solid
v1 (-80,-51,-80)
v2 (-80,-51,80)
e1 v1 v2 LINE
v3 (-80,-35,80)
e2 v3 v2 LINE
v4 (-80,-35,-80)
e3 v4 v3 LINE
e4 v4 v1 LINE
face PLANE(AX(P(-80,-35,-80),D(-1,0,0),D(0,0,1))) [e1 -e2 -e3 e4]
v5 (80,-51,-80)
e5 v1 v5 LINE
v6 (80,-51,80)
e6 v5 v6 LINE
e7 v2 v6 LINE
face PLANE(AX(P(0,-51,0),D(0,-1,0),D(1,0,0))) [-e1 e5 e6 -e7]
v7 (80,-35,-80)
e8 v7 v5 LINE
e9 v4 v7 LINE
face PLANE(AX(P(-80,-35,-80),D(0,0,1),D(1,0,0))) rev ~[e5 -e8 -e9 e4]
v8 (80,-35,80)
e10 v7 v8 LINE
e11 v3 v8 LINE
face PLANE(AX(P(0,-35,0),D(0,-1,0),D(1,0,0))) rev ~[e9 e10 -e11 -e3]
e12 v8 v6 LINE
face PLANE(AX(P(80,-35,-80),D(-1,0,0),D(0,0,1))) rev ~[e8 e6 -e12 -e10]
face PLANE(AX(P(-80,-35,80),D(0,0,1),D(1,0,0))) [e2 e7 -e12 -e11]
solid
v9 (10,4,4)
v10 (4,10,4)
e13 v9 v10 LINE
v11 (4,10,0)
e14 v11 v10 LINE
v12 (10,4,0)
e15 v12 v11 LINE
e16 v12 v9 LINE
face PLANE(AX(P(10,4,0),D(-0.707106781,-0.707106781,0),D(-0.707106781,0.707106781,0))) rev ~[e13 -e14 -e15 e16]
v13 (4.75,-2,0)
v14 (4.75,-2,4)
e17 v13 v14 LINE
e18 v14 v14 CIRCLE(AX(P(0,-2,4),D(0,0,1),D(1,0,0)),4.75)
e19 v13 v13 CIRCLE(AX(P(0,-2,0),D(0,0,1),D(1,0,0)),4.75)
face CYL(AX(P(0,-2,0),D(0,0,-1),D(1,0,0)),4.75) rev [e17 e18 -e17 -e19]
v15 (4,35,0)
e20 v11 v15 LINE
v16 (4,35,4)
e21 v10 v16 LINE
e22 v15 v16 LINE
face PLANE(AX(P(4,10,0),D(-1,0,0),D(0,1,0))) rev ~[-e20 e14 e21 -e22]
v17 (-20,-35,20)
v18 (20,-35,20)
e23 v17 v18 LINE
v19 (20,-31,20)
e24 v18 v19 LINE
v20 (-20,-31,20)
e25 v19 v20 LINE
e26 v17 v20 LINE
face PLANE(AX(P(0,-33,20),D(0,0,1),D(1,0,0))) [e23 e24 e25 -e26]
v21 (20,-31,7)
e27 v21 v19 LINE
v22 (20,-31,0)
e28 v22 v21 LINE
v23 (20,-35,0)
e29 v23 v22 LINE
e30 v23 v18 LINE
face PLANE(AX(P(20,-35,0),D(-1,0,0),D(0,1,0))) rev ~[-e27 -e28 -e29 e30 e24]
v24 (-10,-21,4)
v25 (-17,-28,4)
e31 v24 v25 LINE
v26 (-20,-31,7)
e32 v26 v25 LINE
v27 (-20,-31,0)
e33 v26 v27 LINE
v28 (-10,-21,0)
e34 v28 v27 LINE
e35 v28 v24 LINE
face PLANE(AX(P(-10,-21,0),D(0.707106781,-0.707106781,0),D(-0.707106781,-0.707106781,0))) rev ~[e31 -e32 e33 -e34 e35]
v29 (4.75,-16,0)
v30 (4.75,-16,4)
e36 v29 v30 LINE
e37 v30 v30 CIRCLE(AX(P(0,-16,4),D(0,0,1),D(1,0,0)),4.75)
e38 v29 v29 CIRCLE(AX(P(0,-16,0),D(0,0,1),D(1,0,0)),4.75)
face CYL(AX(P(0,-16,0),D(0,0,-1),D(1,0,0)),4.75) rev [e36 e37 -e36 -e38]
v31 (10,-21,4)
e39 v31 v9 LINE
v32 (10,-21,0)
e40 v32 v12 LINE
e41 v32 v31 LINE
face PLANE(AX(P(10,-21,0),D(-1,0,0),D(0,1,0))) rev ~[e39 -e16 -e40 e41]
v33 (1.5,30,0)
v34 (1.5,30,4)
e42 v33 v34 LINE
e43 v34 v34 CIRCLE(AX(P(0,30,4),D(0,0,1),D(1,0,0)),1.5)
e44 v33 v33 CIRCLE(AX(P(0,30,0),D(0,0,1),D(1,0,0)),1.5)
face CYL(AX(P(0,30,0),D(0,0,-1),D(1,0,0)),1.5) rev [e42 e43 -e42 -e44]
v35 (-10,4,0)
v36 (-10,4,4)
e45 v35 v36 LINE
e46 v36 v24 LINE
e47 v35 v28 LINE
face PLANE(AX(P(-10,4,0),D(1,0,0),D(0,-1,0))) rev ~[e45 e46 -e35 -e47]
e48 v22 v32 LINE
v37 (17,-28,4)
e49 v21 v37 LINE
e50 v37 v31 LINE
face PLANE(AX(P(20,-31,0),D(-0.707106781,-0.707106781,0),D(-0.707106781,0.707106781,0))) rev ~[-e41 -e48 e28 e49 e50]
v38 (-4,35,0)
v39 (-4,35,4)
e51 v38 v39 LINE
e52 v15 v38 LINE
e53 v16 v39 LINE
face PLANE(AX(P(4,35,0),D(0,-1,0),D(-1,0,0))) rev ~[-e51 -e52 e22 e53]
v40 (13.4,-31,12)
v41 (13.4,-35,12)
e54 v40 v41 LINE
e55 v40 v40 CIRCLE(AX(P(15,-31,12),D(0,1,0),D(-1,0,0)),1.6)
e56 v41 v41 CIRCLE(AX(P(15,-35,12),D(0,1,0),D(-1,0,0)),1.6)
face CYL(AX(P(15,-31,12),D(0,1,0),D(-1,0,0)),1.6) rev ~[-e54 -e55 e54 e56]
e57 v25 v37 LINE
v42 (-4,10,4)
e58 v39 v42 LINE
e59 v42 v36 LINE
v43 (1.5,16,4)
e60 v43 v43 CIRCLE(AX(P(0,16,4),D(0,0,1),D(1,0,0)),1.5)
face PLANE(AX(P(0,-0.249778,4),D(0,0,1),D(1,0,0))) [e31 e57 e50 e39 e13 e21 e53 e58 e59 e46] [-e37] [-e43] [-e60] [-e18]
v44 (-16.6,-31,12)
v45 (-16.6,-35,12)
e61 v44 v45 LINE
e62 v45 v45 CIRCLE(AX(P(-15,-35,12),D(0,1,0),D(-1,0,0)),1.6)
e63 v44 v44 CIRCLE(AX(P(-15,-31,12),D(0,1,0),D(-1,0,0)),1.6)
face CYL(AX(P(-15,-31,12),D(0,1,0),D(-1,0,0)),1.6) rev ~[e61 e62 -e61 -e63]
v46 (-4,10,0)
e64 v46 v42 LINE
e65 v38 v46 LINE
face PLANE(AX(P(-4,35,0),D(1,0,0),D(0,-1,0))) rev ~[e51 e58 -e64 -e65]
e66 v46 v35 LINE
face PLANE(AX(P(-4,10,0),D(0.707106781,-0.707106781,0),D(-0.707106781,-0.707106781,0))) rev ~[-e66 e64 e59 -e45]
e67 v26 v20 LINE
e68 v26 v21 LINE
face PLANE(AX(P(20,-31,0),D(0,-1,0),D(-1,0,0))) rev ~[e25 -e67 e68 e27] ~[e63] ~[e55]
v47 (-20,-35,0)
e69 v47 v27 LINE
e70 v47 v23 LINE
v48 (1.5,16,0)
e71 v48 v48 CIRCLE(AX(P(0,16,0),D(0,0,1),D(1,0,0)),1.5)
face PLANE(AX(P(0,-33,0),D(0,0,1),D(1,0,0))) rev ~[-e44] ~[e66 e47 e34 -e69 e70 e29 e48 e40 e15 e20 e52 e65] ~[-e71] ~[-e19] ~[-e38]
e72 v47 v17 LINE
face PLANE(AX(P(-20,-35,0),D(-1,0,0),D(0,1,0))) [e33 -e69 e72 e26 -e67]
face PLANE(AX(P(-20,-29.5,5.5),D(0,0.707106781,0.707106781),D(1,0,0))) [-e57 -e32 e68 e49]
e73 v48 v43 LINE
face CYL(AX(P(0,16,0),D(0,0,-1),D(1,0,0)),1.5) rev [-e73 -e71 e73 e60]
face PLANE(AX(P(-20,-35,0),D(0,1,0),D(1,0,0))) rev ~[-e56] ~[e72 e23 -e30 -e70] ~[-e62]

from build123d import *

# Parameters (mm, degrees)
F0_R     = 4.75
F0_R_2   = 1.5
F1_DEPTH = 4
F0_W     = 20
F0_H     = 4
F0_W_2   = 10
F2_DEPTH = 20
F3_R     = 1.6
F4_DEPTH = 4
F5_SIZE  = 3
F6_W     = 160
F6_H     = 160
F6_W_2   = 40
F6_H_2   = 20
F6_R     = 1.6
F7_DEPTH = 16


with BuildPart() as f1:
    # F0 (on Top) → F1 (new body)
    with BuildSketch(Plane.XY):
        Polygon((4, 35), (-4, 35), (-4, 10), (-10, 4), (-10, -21), (-10, -31), (10, -31), (10, -21), (10, 4), (4, 10), align=None)
        with Locations((0, -16)):
            Circle(F0_R, mode=Mode.SUBTRACT)
        with Locations((0, -2)):
            Circle(F0_R, mode=Mode.SUBTRACT)
        with Locations((0, 16)):
            Circle(F0_R_2, mode=Mode.SUBTRACT)
        with Locations((0, 30)):
            Circle(F0_R_2, mode=Mode.SUBTRACT)
        Polygon((-10, -31), (-10, -21), (-20, -31), align=None)
        Polygon((20, -31), (10, -21), (10, -31), align=None)
    extrude(amount=F1_DEPTH)

    # F0 (on Top) → F2 (join)
    with BuildSketch(Plane.XY):
        with Locations((0, -33)):
            Rectangle(F0_W, F0_H)
        with Locations((-15, -33)):
            Rectangle(F0_W_2, F0_H)
        with Locations((15, -33)):
            Rectangle(F0_W_2, F0_H)
    extrude(amount=F2_DEPTH)

    # F3 (on face) → F4 (cut, through all)
    with BuildSketch(Plane(origin=(0, -31, 0), x_dir=(-1, 0, 0), z_dir=(0, 1, 0))):
        with Locations((-15, 12)):
            Circle(F3_R)
        with Locations((15, 12)):
            Circle(F3_R)
    extrude(amount=-F4_DEPTH, mode=Mode.SUBTRACT)

    # F5
    f5_edges = [f1.edges().sort_by_distance(p)[0] for p in [
        (0, -31, 4),
    ]]
    chamfer(f5_edges, length=F5_SIZE)


with BuildPart() as f7:
    # F6 (on face) → F7 (new body)
    with BuildSketch(Plane.XZ.offset(35)):
        Rectangle(F6_W, F6_H)
        with Locations((0, 10)):
            Rectangle(F6_W_2, F6_H_2, mode=Mode.SUBTRACT)
        with Locations((0, 10)):
            Rectangle(F6_W_2, F6_H_2)
        with Locations((-15, 12)):
            Circle(F6_R, mode=Mode.SUBTRACT)
        with Locations((15, 12)):
            Circle(F6_R, mode=Mode.SUBTRACT)
        with Locations((-15, 12)):
            Circle(F6_R)
        with Locations((15, 12)):
            Circle(F6_R)
    extrude(amount=F7_DEPTH)


solid = Compound([f1.part, f7.part])
